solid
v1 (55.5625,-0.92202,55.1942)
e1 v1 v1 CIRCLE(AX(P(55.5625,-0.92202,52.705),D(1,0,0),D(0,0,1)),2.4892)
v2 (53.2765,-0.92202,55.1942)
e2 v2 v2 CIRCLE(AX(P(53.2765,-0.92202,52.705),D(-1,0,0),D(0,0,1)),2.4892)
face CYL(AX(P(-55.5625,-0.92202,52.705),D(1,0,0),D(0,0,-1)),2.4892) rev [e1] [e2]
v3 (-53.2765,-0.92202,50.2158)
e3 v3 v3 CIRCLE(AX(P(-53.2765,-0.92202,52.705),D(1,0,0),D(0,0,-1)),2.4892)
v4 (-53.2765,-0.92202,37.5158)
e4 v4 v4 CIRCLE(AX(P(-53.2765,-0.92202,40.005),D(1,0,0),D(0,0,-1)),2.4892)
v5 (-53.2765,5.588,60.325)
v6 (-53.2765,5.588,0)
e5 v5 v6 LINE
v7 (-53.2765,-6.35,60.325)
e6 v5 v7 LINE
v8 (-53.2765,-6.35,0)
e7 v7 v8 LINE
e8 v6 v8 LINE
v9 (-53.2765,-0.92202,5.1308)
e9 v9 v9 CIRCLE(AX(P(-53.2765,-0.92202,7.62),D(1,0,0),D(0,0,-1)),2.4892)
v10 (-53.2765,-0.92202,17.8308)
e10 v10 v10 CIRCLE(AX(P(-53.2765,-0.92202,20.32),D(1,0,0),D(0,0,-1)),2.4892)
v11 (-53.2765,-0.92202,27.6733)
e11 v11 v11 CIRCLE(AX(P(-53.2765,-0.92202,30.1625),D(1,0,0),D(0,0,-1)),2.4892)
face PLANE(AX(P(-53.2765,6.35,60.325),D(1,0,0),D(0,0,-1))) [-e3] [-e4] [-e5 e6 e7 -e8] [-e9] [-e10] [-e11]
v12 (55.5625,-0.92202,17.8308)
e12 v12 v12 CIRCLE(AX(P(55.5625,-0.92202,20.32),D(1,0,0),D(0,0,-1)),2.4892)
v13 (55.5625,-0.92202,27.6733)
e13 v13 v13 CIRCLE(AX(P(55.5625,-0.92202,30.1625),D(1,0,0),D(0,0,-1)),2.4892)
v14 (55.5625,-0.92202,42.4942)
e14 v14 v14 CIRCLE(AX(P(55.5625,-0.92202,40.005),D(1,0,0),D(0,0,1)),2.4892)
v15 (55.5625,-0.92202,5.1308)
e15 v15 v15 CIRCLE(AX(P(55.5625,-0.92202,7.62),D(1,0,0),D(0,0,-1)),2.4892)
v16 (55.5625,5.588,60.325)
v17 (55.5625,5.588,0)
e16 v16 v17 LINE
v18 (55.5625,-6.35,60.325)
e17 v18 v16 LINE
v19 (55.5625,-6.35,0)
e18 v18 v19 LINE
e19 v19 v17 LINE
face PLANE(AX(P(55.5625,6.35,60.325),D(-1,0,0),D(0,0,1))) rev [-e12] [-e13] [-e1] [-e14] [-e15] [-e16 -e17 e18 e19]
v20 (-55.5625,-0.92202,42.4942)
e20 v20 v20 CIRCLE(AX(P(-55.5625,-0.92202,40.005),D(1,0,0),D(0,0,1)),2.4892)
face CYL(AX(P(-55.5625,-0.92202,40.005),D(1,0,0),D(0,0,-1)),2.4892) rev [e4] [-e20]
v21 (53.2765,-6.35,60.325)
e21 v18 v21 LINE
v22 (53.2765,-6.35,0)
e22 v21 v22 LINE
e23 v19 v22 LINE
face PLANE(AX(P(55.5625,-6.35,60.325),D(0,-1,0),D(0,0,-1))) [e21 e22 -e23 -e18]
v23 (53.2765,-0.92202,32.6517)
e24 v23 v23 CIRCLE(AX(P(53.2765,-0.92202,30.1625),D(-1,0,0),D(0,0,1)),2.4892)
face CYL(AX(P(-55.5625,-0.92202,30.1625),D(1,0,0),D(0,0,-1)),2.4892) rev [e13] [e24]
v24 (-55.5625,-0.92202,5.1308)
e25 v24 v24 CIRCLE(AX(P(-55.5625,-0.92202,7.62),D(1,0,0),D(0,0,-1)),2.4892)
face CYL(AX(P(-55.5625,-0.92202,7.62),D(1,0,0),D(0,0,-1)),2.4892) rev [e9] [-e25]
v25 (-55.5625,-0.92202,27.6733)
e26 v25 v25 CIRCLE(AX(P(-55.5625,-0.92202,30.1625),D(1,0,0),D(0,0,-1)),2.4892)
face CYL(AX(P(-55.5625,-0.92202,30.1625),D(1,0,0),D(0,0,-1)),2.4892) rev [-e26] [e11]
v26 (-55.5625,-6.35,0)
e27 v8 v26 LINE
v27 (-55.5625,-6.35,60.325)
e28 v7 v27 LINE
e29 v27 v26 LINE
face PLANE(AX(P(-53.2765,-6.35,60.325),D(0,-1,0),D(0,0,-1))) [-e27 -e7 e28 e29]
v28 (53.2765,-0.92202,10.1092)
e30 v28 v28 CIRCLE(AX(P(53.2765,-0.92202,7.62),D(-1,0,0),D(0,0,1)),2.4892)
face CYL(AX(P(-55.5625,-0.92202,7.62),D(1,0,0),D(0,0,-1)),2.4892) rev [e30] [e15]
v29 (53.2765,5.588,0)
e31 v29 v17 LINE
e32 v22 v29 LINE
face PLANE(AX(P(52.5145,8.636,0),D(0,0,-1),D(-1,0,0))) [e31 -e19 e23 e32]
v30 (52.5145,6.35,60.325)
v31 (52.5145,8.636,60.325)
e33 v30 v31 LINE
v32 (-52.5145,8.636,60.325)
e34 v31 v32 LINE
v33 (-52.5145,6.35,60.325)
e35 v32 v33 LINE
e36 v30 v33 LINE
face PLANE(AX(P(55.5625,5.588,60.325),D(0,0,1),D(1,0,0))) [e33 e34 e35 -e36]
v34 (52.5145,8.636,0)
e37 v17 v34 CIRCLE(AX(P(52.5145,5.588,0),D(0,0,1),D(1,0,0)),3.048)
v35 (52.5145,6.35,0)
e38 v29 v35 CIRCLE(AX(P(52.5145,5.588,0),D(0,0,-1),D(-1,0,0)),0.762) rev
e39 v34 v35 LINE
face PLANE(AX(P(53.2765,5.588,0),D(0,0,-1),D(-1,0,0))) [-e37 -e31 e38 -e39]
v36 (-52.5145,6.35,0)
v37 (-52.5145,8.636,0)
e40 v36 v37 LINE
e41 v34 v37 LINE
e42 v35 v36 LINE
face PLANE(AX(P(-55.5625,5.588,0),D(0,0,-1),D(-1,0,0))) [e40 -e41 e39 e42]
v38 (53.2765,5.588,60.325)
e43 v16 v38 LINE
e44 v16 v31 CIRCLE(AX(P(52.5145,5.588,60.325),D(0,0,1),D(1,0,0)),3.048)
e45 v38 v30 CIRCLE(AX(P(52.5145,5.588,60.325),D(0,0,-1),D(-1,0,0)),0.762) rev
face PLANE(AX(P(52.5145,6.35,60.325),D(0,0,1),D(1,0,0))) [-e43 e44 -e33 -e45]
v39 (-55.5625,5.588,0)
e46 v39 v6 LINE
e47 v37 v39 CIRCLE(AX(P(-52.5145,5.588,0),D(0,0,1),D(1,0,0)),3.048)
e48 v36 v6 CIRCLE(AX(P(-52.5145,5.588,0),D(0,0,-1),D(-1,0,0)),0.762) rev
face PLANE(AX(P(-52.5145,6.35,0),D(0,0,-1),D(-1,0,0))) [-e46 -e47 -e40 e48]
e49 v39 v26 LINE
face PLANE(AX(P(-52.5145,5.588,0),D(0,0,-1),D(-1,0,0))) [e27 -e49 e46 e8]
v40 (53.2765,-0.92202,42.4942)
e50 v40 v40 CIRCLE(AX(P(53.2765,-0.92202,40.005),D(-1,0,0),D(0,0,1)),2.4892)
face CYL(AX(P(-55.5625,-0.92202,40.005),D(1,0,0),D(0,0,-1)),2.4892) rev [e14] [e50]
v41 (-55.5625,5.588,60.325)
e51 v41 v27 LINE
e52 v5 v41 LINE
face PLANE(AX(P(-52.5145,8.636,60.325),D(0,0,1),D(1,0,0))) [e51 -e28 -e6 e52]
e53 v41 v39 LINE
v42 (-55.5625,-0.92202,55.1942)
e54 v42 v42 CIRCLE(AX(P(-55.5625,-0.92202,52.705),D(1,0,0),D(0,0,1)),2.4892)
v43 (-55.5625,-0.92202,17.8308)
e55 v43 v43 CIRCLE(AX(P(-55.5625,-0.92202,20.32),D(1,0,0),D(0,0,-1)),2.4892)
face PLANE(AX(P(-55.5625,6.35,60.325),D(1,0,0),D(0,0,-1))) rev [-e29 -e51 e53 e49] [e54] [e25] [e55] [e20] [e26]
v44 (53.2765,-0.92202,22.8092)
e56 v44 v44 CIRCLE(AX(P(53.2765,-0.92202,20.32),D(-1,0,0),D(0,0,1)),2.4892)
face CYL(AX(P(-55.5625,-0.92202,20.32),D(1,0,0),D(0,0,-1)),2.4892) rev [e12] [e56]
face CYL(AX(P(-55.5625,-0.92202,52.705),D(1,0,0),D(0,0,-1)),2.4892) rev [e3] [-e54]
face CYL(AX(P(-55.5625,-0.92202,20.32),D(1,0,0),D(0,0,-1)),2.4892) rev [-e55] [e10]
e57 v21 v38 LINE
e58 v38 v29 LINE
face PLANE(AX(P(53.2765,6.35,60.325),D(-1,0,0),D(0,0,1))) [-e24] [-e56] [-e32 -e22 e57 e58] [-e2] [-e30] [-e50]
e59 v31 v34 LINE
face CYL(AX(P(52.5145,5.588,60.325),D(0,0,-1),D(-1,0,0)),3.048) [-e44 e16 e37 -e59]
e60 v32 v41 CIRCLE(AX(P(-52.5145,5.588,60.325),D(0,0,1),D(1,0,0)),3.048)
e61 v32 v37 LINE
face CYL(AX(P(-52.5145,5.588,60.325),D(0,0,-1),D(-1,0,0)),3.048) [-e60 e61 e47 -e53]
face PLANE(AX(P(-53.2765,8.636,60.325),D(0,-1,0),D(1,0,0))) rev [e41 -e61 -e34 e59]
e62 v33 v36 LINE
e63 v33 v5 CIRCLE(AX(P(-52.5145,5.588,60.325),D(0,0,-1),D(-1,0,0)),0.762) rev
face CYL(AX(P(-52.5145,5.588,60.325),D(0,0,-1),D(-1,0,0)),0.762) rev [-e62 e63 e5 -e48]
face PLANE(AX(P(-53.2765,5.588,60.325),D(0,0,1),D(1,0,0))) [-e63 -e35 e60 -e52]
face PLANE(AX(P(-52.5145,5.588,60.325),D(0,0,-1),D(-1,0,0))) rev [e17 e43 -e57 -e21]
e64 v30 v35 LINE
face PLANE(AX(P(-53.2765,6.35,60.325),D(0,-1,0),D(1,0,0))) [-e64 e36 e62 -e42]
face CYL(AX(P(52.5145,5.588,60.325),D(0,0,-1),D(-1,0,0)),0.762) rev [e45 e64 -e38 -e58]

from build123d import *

# Parameters (mm, degrees)
BASE_FLANGE1_DEPTH      = 60.325
CUT_EXTRUDE1_DEPTH      = 83.467433131
CUT_EXTRUDE1_DEPTH_BACK = 83.467433131
SKETCH6_R               = 2.4892


# Sheet-metal steps are written as plain solids
with BuildPart() as part:
    # Sketch1 → Base-Flange1 (new body)
    with BuildSketch(Plane.XY):
        with BuildLine():
            Line((-53.2765, -6.35), (-53.2765, 5.588))
            ThreePointArc((-53.2765, 5.588), (-53.053315367, 6.126815367), (-52.5145, 6.35))
            Line((-52.5145, 6.35), (52.5145, 6.35))
            ThreePointArc((52.5145, 6.35), (53.053315367, 6.126815367), (53.2765, 5.588))
            Line((53.2765, 5.588), (53.2765, -6.35))
            Line((53.2765, -6.35), (55.5625, -6.35))
            Line((55.5625, -6.35), (55.5625, 5.588))
            ThreePointArc((55.5625, 5.588), (54.669761469, 7.743261469), (52.5145, 8.636))
            Line((52.5145, 8.636), (-52.5145, 8.636))
            ThreePointArc((-52.5145, 8.636), (-54.669761469, 7.743261469), (-55.5625, 5.588))
            Line((-55.5625, 5.588), (-55.5625, -6.35))
            Line((-55.5625, -6.35), (-53.2765, -6.35))
        make_face()
    extrude(amount=BASE_FLANGE1_DEPTH)

    # Sketch6 → Cut-Extrude1 (cut, two sides: drawn at the far end of the back side and taken through both)
    with BuildSketch(Plane(origin=(0, 0, 0), x_dir=(0, 0, -1), z_dir=(1, 0, 0)).offset(-CUT_EXTRUDE1_DEPTH_BACK)):
        with Locations((-30.1625, -0.92202)):
            Circle(SKETCH6_R)
        with Locations((-20.32, -0.92202)):
            Circle(SKETCH6_R)
        with Locations((-7.62, -0.92202)):
            Circle(SKETCH6_R)
        with Locations(Location((-52.705, -0.92202, 0), (0, 0, 180))):
            Circle(SKETCH6_R)
        with Locations(Location((-40.005, -0.92202, 0), (0, 0, 180))):
            Circle(SKETCH6_R)
    extrude(amount=CUT_EXTRUDE1_DEPTH + CUT_EXTRUDE1_DEPTH_BACK, mode=Mode.SUBTRACT)


solid = part.part
